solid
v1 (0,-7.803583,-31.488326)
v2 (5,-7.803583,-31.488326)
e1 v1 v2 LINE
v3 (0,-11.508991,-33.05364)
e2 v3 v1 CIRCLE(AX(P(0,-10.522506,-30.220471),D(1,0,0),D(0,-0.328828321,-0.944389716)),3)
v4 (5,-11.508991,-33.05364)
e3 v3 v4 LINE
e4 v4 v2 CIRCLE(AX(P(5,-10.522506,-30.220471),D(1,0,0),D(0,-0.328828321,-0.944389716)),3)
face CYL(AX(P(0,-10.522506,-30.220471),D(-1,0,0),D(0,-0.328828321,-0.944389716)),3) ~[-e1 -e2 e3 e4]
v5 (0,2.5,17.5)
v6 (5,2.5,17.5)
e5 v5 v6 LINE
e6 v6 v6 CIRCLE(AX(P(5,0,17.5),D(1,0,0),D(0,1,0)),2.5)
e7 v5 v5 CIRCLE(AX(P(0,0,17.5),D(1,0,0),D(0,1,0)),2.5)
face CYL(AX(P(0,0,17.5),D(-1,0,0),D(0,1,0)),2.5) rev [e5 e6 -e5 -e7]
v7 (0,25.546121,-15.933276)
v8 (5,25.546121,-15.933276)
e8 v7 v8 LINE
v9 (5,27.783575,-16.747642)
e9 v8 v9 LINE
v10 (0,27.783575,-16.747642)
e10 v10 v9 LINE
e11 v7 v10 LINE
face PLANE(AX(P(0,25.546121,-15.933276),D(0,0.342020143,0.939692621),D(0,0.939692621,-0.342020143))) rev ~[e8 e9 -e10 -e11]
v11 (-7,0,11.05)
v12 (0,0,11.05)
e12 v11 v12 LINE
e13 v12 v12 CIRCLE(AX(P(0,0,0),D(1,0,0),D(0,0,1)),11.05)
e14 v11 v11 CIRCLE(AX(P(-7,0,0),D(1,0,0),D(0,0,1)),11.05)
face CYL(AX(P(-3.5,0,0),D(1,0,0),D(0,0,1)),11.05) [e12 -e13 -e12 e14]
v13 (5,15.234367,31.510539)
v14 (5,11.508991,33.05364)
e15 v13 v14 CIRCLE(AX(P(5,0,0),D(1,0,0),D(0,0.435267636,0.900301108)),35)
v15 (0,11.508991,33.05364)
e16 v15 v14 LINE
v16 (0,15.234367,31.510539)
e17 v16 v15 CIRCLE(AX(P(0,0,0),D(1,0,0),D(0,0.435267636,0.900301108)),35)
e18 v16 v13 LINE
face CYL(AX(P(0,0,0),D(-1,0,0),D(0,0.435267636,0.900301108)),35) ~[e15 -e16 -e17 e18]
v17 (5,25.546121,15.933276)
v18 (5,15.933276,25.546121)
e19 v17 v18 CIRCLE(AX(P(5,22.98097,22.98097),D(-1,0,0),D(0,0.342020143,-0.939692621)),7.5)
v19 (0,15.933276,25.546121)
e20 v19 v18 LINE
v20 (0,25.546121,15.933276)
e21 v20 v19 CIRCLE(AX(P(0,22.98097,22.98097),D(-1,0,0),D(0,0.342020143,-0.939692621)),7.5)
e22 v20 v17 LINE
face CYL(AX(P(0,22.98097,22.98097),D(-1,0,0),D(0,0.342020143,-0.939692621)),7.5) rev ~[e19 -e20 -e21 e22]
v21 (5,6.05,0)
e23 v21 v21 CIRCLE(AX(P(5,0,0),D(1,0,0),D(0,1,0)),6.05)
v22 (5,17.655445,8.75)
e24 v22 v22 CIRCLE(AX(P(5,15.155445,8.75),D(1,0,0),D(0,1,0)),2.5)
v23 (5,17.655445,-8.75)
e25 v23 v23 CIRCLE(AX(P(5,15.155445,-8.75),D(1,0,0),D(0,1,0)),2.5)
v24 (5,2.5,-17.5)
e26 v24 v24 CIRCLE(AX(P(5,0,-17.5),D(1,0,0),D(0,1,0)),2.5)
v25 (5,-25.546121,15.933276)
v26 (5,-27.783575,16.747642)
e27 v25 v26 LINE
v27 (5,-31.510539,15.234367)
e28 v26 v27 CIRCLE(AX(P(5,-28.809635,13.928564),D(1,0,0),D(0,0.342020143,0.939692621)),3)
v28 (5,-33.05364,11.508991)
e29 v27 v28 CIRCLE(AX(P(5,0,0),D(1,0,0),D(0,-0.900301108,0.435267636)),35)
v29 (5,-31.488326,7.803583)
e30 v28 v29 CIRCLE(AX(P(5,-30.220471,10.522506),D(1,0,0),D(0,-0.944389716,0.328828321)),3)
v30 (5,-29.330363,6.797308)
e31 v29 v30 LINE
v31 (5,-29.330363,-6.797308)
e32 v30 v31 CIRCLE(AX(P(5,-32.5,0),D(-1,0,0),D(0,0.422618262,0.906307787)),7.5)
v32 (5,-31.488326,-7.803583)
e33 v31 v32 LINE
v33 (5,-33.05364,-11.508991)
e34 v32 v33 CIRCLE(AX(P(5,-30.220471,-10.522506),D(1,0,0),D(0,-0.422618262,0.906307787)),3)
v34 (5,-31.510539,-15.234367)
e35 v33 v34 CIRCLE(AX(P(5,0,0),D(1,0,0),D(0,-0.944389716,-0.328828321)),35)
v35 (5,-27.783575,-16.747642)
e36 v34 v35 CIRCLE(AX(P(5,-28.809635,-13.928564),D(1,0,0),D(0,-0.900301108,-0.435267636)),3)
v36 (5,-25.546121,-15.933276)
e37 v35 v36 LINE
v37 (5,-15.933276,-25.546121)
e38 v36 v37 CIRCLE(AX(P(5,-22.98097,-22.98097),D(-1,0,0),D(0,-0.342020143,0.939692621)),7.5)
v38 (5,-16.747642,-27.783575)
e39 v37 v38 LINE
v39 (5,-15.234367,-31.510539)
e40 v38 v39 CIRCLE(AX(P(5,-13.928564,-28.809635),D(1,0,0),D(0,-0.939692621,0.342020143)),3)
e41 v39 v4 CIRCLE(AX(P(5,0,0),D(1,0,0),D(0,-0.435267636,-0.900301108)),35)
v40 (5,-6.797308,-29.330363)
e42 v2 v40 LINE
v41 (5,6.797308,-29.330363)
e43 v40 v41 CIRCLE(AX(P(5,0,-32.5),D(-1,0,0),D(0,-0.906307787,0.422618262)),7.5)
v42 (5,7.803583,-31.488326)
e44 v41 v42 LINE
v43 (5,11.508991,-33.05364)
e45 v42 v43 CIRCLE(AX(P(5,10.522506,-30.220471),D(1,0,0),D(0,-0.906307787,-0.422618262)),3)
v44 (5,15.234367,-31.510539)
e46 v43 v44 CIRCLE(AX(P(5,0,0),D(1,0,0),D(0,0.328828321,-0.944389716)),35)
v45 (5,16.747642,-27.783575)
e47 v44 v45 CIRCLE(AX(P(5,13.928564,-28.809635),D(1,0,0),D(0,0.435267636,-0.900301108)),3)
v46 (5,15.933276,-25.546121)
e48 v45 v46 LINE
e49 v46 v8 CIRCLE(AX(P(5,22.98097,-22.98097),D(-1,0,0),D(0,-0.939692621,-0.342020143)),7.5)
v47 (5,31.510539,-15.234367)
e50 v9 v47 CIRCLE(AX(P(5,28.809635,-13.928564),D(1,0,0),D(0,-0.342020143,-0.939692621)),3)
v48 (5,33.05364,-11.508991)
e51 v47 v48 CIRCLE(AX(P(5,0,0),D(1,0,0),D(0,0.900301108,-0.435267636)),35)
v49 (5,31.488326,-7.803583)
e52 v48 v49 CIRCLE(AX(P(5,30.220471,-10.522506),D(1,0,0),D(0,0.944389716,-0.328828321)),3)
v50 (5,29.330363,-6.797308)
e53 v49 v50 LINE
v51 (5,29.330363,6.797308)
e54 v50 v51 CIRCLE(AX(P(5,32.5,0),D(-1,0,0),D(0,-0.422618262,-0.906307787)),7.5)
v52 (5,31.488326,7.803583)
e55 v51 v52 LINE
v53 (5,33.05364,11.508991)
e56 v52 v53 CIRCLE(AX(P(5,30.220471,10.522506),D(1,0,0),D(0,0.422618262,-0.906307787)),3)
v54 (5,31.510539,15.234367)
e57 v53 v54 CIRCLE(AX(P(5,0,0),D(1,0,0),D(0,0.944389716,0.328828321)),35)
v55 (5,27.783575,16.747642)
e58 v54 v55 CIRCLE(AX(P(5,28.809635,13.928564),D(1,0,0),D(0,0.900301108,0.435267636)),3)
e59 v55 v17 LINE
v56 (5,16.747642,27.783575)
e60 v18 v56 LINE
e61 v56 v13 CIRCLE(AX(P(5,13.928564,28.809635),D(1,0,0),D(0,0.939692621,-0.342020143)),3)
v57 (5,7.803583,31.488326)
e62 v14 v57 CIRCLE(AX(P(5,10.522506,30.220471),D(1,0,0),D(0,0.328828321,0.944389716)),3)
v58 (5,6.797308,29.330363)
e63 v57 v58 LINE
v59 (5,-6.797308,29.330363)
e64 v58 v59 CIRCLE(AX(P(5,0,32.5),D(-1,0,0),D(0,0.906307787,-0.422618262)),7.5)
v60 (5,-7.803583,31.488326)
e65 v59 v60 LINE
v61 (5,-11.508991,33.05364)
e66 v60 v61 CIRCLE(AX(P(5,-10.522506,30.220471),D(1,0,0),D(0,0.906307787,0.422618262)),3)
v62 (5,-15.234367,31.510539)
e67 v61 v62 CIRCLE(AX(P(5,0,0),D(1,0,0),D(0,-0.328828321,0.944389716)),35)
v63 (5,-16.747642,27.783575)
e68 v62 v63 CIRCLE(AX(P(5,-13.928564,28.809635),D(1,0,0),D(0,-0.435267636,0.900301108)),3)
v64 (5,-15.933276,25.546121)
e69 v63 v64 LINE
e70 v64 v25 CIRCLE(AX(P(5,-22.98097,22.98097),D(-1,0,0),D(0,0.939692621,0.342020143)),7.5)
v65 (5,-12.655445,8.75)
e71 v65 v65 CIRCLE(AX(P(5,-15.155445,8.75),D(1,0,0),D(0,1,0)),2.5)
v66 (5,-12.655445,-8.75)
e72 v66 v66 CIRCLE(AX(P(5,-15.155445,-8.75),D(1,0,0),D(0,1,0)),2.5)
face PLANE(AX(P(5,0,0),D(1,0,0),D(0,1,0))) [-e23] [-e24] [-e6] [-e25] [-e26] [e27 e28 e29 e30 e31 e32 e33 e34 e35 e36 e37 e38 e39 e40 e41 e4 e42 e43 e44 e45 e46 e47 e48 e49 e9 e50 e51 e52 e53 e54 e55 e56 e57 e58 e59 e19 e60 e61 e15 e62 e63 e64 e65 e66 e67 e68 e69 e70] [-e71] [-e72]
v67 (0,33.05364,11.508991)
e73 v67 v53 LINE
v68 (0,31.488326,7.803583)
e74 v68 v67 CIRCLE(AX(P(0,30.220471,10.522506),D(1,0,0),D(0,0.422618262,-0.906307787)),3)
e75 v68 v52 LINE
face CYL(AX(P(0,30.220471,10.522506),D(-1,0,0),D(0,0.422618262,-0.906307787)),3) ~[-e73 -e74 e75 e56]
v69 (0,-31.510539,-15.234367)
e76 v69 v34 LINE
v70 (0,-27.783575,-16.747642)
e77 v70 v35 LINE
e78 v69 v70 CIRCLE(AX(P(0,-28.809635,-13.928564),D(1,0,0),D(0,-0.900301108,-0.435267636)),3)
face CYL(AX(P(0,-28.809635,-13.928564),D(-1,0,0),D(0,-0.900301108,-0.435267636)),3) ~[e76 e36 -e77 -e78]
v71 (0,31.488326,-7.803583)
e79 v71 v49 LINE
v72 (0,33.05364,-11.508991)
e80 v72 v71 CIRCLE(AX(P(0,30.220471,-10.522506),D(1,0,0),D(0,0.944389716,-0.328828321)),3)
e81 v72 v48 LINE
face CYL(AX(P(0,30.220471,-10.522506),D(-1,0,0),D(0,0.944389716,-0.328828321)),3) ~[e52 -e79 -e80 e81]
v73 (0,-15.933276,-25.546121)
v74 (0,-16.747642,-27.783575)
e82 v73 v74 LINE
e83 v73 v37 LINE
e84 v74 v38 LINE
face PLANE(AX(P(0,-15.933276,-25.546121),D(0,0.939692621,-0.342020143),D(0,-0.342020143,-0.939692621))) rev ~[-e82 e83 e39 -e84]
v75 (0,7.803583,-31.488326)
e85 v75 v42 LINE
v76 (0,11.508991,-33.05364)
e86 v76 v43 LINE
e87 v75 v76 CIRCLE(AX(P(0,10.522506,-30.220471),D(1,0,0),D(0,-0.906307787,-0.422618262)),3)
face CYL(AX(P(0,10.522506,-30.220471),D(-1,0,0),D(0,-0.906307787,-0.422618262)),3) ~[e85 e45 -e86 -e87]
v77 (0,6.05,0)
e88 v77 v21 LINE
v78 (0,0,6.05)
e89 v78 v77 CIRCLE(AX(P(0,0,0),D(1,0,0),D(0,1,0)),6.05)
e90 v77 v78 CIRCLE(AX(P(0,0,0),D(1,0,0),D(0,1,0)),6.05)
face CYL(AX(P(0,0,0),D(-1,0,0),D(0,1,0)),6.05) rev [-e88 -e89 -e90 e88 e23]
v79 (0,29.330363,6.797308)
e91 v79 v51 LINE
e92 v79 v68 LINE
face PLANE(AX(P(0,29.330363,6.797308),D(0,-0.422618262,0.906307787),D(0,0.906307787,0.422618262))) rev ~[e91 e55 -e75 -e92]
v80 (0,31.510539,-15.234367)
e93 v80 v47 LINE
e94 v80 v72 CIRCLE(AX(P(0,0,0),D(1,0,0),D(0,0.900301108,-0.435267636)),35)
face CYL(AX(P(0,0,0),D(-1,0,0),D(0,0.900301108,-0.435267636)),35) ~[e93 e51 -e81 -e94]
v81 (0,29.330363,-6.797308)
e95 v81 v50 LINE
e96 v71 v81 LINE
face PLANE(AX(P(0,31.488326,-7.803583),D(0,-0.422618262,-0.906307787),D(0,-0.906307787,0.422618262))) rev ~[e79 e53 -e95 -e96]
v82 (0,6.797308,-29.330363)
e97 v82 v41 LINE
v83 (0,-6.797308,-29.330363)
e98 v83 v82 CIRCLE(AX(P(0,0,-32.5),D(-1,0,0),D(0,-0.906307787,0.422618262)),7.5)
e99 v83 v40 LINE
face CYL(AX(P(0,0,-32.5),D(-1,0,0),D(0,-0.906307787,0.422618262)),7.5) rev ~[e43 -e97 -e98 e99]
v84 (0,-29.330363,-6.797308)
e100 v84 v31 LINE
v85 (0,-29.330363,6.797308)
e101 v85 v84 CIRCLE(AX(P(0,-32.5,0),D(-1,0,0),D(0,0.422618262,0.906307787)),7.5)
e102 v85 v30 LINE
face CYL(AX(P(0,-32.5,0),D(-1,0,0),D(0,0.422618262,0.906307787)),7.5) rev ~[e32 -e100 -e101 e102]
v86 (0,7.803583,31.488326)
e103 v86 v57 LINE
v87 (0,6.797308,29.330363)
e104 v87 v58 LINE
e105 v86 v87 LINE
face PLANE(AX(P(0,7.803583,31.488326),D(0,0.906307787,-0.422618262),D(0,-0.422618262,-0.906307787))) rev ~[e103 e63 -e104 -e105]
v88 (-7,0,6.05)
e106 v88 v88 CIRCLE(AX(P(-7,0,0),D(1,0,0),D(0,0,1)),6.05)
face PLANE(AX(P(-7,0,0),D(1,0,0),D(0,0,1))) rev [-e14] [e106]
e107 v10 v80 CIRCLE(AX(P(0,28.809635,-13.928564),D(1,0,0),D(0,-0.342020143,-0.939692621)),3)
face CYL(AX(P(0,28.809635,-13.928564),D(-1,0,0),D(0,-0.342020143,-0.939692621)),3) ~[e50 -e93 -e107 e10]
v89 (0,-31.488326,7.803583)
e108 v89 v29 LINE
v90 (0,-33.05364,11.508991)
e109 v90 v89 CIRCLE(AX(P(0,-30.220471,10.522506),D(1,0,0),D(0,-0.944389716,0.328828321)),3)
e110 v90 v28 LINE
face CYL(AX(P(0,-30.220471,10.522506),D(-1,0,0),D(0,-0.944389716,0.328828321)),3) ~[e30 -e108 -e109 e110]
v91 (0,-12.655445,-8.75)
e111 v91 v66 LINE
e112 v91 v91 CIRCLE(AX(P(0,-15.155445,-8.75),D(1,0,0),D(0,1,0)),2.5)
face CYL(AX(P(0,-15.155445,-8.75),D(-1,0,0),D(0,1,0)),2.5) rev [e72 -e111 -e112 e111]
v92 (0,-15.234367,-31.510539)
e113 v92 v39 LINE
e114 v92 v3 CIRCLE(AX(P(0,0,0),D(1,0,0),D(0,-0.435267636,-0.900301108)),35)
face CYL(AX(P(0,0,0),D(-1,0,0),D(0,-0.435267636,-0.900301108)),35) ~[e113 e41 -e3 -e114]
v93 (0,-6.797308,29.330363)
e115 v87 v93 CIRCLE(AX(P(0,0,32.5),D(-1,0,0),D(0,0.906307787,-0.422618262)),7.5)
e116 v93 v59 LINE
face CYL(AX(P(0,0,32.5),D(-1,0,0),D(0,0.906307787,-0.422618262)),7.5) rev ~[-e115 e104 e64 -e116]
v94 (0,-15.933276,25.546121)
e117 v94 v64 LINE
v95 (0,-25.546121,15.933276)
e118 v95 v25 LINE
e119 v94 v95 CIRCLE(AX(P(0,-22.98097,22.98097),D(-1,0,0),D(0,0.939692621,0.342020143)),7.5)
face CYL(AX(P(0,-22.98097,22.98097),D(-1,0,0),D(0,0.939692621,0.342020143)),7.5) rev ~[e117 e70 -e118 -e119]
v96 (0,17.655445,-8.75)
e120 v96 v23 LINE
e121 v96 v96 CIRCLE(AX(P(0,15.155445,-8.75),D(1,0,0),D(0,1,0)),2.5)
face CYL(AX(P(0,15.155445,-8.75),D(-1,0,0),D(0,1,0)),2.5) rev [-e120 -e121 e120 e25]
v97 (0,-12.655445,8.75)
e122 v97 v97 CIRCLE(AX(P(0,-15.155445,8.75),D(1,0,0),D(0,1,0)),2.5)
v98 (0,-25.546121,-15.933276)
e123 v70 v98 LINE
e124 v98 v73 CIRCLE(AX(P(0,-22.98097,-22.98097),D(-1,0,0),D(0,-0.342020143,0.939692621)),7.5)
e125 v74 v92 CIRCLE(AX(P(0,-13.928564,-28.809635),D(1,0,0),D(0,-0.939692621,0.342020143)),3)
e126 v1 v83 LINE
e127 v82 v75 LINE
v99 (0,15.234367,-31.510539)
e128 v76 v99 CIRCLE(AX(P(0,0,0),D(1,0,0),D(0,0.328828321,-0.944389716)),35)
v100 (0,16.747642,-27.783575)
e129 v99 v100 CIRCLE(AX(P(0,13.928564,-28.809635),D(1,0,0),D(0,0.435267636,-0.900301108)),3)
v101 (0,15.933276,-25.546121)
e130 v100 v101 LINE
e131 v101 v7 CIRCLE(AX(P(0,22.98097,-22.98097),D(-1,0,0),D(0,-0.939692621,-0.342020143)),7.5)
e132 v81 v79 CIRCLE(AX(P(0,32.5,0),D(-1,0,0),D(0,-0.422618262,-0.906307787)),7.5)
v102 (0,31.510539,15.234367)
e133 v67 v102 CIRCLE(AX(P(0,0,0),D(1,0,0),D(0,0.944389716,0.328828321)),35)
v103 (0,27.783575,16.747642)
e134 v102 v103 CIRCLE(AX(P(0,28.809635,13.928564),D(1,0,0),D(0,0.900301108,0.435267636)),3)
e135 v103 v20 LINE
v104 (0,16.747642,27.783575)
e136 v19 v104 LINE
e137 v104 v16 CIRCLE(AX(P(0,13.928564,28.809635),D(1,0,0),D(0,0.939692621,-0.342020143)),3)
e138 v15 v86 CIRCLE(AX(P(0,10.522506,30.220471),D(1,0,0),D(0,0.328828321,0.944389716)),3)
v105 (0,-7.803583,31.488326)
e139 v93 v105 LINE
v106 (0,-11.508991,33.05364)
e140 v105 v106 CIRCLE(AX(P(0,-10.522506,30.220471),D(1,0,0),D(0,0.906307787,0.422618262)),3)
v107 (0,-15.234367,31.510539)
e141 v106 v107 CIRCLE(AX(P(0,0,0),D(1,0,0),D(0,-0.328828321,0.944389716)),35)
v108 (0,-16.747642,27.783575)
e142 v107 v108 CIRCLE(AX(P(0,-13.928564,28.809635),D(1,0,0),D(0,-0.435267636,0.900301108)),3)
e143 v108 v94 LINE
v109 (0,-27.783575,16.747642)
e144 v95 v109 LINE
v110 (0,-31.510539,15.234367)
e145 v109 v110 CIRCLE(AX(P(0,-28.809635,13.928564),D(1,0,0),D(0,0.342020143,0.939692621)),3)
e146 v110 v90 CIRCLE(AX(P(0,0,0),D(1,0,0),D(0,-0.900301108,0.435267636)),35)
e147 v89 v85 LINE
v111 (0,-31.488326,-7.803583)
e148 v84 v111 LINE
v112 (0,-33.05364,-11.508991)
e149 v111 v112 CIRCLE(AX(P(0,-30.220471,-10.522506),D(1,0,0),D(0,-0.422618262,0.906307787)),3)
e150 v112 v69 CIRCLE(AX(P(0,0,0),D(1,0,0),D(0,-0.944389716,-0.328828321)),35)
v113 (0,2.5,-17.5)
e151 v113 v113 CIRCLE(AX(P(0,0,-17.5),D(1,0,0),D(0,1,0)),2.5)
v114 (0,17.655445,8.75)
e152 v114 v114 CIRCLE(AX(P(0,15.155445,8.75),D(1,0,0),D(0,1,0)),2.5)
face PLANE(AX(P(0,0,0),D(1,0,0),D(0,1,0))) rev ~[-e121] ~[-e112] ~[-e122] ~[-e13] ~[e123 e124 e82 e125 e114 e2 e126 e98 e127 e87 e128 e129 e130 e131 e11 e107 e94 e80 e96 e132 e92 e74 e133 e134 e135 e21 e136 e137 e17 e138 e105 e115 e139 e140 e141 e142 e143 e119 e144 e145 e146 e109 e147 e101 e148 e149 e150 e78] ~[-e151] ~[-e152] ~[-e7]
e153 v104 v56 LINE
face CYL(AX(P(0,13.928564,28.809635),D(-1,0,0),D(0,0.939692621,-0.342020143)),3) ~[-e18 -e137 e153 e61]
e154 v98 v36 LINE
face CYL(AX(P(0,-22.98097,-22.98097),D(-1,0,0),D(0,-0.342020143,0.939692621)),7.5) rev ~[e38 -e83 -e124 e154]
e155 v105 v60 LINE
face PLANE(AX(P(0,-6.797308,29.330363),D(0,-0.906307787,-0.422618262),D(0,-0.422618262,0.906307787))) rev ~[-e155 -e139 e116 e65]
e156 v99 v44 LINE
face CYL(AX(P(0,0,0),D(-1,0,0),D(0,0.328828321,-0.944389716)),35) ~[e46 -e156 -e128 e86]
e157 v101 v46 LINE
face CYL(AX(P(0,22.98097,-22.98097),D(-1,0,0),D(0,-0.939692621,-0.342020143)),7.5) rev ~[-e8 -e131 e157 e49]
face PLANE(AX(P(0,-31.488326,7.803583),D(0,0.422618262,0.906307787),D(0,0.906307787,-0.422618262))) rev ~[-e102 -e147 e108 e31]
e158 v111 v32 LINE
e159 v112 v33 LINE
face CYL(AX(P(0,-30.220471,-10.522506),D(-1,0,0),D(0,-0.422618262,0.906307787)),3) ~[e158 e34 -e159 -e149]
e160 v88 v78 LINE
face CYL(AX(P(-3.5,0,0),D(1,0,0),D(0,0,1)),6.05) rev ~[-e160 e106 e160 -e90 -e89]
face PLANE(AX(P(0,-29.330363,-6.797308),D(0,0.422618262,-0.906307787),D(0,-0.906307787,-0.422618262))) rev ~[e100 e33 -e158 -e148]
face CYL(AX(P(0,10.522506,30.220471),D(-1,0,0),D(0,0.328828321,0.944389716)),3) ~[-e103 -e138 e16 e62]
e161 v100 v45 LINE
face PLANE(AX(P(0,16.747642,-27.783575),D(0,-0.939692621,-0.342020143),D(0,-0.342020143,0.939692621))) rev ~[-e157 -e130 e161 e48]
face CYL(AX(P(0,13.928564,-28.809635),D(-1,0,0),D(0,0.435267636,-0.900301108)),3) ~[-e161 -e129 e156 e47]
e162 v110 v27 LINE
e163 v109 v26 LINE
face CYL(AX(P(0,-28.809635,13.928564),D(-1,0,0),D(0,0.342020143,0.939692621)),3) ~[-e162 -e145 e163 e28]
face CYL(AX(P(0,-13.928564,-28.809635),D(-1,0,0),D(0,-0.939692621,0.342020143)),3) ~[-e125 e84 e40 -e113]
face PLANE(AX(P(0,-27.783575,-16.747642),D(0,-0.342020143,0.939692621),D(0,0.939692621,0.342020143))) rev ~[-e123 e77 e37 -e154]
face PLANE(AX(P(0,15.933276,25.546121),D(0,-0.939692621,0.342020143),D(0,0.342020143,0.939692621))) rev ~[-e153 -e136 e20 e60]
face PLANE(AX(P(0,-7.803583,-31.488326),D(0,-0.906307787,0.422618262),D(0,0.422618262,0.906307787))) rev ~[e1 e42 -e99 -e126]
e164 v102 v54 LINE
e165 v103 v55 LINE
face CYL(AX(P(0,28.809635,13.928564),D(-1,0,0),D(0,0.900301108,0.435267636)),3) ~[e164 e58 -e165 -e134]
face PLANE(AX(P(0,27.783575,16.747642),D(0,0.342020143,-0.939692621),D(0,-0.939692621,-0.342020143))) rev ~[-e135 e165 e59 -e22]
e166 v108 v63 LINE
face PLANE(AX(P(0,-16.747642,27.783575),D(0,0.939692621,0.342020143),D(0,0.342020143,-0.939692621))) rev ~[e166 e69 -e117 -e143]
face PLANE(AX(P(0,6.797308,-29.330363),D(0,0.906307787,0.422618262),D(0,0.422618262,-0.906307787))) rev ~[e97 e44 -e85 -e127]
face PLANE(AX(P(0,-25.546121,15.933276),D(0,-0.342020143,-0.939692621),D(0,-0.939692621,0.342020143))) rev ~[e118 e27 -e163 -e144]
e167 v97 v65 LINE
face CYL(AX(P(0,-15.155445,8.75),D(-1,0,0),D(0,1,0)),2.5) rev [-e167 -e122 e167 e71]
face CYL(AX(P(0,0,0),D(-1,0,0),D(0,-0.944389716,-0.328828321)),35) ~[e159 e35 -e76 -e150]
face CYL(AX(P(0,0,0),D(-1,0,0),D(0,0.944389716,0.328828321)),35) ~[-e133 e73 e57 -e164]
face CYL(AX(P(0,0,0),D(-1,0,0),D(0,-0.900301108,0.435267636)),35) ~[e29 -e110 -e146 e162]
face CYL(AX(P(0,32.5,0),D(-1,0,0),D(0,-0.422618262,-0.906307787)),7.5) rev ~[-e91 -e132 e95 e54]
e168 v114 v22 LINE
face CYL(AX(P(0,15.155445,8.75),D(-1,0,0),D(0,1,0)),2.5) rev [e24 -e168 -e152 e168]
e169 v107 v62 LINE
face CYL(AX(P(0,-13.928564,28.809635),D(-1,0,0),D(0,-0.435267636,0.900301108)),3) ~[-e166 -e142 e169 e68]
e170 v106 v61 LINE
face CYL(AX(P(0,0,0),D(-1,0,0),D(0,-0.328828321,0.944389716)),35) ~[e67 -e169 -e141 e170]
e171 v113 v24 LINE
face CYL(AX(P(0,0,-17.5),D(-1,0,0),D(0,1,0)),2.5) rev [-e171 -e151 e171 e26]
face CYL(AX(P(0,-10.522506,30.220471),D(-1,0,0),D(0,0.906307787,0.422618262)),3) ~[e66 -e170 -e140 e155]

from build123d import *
from build123d import SkipClean  # not in build123d's __all__

# Parameters (mm, degrees)
F0_R     = 2.5
F0_R_2   = 6.05
F1_DEPTH = 5
F2_W     = 7
F2_H     = 5


with BuildPart() as f1:
    # F0 (on Right) → F1 (new body)
    with BuildSketch(Plane.YZ):
        with BuildLine():
            ThreePointArc((6.7973084028, 29.3303630369), (0, 25), (-6.7973084028, 29.3303630369))
            Line((-6.7973084028, 29.3303630369), (-7.8035829138, 31.4883256898))
            ThreePointArc((-7.8035829138, 31.4883256898), (-9.3550783484, 32.9840034331), (-11.5089912382, 33.0536400519))
            ThreePointArc((-11.5089912382, 33.0536400519), (-13.3939201328, 32.3357836379), (-15.2343672744, 31.5105387727))
            ThreePointArc((-15.2343672744, 31.5105387727), (-16.7081731596, 29.9382518369), (-16.7476422276, 27.7835750194))
            Line((-16.7476422276, 27.7835750194), (-15.9332757327, 25.5461214635))
            ThreePointArc((-15.9332757327, 25.5461214635), (-17.6776695297, 17.6776695297), (-25.5461214635, 15.9332757327))
            Line((-25.5461214635, 15.9332757327), (-27.7835750194, 16.7476422276))
            ThreePointArc((-27.7835750194, 16.7476422276), (-29.9382518369, 16.7081731596), (-31.5105387727, 15.2343672744))
            ThreePointArc((-31.5105387727, 15.2343672744), (-32.3357836379, 13.3939201328), (-33.0536400519, 11.5089912382))
            ThreePointArc((-33.0536400519, 11.5089912382), (-32.9840034331, 9.3550783484), (-31.4883256898, 7.8035829138))
            Line((-31.4883256898, 7.8035829138), (-29.3303630369, 6.7973084028))
            ThreePointArc((-29.3303630369, 6.7973084028), (-25, 0), (-29.3303630369, -6.7973084028))
            Line((-29.3303630369, -6.7973084028), (-31.4883256898, -7.8035829138))
            ThreePointArc((-31.4883256898, -7.8035829138), (-32.9840034331, -9.3550783484), (-33.0536400519, -11.5089912382))
            ThreePointArc((-33.0536400519, -11.5089912382), (-32.3357836379, -13.3939201328), (-31.5105387727, -15.2343672744))
            ThreePointArc((-31.5105387727, -15.2343672744), (-29.9382518369, -16.7081731596), (-27.7835750194, -16.7476422276))
            Line((-27.7835750194, -16.7476422276), (-25.5461214635, -15.9332757327))
            ThreePointArc((-25.5461214635, -15.9332757327), (-17.6776695297, -17.6776695297), (-15.9332757327, -25.5461214635))
            Line((-15.9332757327, -25.5461214635), (-16.7476422276, -27.7835750194))
            ThreePointArc((-16.7476422276, -27.7835750194), (-16.7081731596, -29.9382518369), (-15.2343672744, -31.5105387727))
            ThreePointArc((-15.2343672744, -31.5105387727), (-13.3939201328, -32.3357836379), (-11.5089912382, -33.0536400519))
            ThreePointArc((-11.5089912382, -33.0536400519), (-9.3550783484, -32.9840034331), (-7.8035829138, -31.4883256898))
            Line((-7.8035829138, -31.4883256898), (-6.7973084028, -29.3303630369))
            ThreePointArc((-6.7973084028, -29.3303630369), (0, -25), (6.7973084028, -29.3303630369))
            Line((6.7973084028, -29.3303630369), (7.8035829138, -31.4883256898))
            ThreePointArc((7.8035829138, -31.4883256898), (9.3550783484, -32.9840034331), (11.5089912382, -33.0536400519))
            ThreePointArc((11.5089912382, -33.0536400519), (13.3939201328, -32.3357836379), (15.2343672744, -31.5105387727))
            ThreePointArc((15.2343672744, -31.5105387727), (16.7081731596, -29.9382518369), (16.7476422276, -27.7835750194))
            Line((16.7476422276, -27.7835750194), (15.9332757327, -25.5461214635))
            ThreePointArc((15.9332757327, -25.5461214635), (17.6776695297, -17.6776695297), (25.5461214635, -15.9332757327))
            Line((25.5461214635, -15.9332757327), (27.7835750194, -16.7476422276))
            ThreePointArc((27.7835750194, -16.7476422276), (29.9382518369, -16.7081731596), (31.5105387727, -15.2343672744))
            ThreePointArc((31.5105387727, -15.2343672744), (32.3357836379, -13.3939201328), (33.0536400519, -11.5089912382))
            ThreePointArc((33.0536400519, -11.5089912382), (32.9840034331, -9.3550783484), (31.4883256898, -7.8035829138))
            Line((31.4883256898, -7.8035829138), (29.3303630369, -6.7973084028))
            ThreePointArc((29.3303630369, -6.7973084028), (25, 0), (29.3303630369, 6.7973084028))
            Line((29.3303630369, 6.7973084028), (31.4883256898, 7.8035829138))
            ThreePointArc((31.4883256898, 7.8035829138), (32.9840034331, 9.3550783484), (33.0536400519, 11.5089912382))
            ThreePointArc((33.0536400519, 11.5089912382), (32.3357836379, 13.3939201328), (31.5105387727, 15.2343672744))
            ThreePointArc((31.5105387727, 15.2343672744), (29.9382518369, 16.7081731596), (27.7835750194, 16.7476422276))
            Line((27.7835750194, 16.7476422276), (25.5461214635, 15.9332757327))
            ThreePointArc((25.5461214635, 15.9332757327), (17.6776695297, 17.6776695297), (15.9332757327, 25.5461214635))
            Line((15.9332757327, 25.5461214635), (16.7476422276, 27.7835750194))
            ThreePointArc((16.7476422276, 27.7835750194), (16.7081731596, 29.9382518369), (15.2343672744, 31.5105387727))
            ThreePointArc((15.2343672744, 31.5105387727), (13.3939201328, 32.3357836379), (11.5089912382, 33.0536400519))
            ThreePointArc((11.5089912382, 33.0536400519), (9.3550783484, 32.9840034331), (7.8035829138, 31.4883256898))
            Line((7.8035829138, 31.4883256898), (6.7973084028, 29.3303630369))
        make_face()
        with Locations((-15.1554445662, -8.75)):
            Circle(F0_R, mode=Mode.SUBTRACT)
        with Locations((0, -17.5)):
            Circle(F0_R, mode=Mode.SUBTRACT)
        with Locations((15.1554445662, -8.75)):
            Circle(F0_R, mode=Mode.SUBTRACT)
        with Locations((-15.1554445662, 8.75)):
            Circle(F0_R, mode=Mode.SUBTRACT)
        Circle(F0_R_2, mode=Mode.SUBTRACT)
        with Locations((15.1554445662, 8.75)):
            Circle(F0_R, mode=Mode.SUBTRACT)
        with Locations((0, 17.5)):
            Circle(F0_R, mode=Mode.SUBTRACT)
    extrude(amount=F1_DEPTH)

    # F2 (on Front) → F3 (revolve)
    with BuildSketch(Plane.XZ):
        with Locations((-3.5, 8.55)):
            Rectangle(F2_W, F2_H)
    with SkipClean():  # cleaning this boolean's faces spoils the solid; the shape is the same uncleaned
        revolve(axis=Axis((9.7608398646, 0, 0), (1, 0, 0)))


solid = f1.part
